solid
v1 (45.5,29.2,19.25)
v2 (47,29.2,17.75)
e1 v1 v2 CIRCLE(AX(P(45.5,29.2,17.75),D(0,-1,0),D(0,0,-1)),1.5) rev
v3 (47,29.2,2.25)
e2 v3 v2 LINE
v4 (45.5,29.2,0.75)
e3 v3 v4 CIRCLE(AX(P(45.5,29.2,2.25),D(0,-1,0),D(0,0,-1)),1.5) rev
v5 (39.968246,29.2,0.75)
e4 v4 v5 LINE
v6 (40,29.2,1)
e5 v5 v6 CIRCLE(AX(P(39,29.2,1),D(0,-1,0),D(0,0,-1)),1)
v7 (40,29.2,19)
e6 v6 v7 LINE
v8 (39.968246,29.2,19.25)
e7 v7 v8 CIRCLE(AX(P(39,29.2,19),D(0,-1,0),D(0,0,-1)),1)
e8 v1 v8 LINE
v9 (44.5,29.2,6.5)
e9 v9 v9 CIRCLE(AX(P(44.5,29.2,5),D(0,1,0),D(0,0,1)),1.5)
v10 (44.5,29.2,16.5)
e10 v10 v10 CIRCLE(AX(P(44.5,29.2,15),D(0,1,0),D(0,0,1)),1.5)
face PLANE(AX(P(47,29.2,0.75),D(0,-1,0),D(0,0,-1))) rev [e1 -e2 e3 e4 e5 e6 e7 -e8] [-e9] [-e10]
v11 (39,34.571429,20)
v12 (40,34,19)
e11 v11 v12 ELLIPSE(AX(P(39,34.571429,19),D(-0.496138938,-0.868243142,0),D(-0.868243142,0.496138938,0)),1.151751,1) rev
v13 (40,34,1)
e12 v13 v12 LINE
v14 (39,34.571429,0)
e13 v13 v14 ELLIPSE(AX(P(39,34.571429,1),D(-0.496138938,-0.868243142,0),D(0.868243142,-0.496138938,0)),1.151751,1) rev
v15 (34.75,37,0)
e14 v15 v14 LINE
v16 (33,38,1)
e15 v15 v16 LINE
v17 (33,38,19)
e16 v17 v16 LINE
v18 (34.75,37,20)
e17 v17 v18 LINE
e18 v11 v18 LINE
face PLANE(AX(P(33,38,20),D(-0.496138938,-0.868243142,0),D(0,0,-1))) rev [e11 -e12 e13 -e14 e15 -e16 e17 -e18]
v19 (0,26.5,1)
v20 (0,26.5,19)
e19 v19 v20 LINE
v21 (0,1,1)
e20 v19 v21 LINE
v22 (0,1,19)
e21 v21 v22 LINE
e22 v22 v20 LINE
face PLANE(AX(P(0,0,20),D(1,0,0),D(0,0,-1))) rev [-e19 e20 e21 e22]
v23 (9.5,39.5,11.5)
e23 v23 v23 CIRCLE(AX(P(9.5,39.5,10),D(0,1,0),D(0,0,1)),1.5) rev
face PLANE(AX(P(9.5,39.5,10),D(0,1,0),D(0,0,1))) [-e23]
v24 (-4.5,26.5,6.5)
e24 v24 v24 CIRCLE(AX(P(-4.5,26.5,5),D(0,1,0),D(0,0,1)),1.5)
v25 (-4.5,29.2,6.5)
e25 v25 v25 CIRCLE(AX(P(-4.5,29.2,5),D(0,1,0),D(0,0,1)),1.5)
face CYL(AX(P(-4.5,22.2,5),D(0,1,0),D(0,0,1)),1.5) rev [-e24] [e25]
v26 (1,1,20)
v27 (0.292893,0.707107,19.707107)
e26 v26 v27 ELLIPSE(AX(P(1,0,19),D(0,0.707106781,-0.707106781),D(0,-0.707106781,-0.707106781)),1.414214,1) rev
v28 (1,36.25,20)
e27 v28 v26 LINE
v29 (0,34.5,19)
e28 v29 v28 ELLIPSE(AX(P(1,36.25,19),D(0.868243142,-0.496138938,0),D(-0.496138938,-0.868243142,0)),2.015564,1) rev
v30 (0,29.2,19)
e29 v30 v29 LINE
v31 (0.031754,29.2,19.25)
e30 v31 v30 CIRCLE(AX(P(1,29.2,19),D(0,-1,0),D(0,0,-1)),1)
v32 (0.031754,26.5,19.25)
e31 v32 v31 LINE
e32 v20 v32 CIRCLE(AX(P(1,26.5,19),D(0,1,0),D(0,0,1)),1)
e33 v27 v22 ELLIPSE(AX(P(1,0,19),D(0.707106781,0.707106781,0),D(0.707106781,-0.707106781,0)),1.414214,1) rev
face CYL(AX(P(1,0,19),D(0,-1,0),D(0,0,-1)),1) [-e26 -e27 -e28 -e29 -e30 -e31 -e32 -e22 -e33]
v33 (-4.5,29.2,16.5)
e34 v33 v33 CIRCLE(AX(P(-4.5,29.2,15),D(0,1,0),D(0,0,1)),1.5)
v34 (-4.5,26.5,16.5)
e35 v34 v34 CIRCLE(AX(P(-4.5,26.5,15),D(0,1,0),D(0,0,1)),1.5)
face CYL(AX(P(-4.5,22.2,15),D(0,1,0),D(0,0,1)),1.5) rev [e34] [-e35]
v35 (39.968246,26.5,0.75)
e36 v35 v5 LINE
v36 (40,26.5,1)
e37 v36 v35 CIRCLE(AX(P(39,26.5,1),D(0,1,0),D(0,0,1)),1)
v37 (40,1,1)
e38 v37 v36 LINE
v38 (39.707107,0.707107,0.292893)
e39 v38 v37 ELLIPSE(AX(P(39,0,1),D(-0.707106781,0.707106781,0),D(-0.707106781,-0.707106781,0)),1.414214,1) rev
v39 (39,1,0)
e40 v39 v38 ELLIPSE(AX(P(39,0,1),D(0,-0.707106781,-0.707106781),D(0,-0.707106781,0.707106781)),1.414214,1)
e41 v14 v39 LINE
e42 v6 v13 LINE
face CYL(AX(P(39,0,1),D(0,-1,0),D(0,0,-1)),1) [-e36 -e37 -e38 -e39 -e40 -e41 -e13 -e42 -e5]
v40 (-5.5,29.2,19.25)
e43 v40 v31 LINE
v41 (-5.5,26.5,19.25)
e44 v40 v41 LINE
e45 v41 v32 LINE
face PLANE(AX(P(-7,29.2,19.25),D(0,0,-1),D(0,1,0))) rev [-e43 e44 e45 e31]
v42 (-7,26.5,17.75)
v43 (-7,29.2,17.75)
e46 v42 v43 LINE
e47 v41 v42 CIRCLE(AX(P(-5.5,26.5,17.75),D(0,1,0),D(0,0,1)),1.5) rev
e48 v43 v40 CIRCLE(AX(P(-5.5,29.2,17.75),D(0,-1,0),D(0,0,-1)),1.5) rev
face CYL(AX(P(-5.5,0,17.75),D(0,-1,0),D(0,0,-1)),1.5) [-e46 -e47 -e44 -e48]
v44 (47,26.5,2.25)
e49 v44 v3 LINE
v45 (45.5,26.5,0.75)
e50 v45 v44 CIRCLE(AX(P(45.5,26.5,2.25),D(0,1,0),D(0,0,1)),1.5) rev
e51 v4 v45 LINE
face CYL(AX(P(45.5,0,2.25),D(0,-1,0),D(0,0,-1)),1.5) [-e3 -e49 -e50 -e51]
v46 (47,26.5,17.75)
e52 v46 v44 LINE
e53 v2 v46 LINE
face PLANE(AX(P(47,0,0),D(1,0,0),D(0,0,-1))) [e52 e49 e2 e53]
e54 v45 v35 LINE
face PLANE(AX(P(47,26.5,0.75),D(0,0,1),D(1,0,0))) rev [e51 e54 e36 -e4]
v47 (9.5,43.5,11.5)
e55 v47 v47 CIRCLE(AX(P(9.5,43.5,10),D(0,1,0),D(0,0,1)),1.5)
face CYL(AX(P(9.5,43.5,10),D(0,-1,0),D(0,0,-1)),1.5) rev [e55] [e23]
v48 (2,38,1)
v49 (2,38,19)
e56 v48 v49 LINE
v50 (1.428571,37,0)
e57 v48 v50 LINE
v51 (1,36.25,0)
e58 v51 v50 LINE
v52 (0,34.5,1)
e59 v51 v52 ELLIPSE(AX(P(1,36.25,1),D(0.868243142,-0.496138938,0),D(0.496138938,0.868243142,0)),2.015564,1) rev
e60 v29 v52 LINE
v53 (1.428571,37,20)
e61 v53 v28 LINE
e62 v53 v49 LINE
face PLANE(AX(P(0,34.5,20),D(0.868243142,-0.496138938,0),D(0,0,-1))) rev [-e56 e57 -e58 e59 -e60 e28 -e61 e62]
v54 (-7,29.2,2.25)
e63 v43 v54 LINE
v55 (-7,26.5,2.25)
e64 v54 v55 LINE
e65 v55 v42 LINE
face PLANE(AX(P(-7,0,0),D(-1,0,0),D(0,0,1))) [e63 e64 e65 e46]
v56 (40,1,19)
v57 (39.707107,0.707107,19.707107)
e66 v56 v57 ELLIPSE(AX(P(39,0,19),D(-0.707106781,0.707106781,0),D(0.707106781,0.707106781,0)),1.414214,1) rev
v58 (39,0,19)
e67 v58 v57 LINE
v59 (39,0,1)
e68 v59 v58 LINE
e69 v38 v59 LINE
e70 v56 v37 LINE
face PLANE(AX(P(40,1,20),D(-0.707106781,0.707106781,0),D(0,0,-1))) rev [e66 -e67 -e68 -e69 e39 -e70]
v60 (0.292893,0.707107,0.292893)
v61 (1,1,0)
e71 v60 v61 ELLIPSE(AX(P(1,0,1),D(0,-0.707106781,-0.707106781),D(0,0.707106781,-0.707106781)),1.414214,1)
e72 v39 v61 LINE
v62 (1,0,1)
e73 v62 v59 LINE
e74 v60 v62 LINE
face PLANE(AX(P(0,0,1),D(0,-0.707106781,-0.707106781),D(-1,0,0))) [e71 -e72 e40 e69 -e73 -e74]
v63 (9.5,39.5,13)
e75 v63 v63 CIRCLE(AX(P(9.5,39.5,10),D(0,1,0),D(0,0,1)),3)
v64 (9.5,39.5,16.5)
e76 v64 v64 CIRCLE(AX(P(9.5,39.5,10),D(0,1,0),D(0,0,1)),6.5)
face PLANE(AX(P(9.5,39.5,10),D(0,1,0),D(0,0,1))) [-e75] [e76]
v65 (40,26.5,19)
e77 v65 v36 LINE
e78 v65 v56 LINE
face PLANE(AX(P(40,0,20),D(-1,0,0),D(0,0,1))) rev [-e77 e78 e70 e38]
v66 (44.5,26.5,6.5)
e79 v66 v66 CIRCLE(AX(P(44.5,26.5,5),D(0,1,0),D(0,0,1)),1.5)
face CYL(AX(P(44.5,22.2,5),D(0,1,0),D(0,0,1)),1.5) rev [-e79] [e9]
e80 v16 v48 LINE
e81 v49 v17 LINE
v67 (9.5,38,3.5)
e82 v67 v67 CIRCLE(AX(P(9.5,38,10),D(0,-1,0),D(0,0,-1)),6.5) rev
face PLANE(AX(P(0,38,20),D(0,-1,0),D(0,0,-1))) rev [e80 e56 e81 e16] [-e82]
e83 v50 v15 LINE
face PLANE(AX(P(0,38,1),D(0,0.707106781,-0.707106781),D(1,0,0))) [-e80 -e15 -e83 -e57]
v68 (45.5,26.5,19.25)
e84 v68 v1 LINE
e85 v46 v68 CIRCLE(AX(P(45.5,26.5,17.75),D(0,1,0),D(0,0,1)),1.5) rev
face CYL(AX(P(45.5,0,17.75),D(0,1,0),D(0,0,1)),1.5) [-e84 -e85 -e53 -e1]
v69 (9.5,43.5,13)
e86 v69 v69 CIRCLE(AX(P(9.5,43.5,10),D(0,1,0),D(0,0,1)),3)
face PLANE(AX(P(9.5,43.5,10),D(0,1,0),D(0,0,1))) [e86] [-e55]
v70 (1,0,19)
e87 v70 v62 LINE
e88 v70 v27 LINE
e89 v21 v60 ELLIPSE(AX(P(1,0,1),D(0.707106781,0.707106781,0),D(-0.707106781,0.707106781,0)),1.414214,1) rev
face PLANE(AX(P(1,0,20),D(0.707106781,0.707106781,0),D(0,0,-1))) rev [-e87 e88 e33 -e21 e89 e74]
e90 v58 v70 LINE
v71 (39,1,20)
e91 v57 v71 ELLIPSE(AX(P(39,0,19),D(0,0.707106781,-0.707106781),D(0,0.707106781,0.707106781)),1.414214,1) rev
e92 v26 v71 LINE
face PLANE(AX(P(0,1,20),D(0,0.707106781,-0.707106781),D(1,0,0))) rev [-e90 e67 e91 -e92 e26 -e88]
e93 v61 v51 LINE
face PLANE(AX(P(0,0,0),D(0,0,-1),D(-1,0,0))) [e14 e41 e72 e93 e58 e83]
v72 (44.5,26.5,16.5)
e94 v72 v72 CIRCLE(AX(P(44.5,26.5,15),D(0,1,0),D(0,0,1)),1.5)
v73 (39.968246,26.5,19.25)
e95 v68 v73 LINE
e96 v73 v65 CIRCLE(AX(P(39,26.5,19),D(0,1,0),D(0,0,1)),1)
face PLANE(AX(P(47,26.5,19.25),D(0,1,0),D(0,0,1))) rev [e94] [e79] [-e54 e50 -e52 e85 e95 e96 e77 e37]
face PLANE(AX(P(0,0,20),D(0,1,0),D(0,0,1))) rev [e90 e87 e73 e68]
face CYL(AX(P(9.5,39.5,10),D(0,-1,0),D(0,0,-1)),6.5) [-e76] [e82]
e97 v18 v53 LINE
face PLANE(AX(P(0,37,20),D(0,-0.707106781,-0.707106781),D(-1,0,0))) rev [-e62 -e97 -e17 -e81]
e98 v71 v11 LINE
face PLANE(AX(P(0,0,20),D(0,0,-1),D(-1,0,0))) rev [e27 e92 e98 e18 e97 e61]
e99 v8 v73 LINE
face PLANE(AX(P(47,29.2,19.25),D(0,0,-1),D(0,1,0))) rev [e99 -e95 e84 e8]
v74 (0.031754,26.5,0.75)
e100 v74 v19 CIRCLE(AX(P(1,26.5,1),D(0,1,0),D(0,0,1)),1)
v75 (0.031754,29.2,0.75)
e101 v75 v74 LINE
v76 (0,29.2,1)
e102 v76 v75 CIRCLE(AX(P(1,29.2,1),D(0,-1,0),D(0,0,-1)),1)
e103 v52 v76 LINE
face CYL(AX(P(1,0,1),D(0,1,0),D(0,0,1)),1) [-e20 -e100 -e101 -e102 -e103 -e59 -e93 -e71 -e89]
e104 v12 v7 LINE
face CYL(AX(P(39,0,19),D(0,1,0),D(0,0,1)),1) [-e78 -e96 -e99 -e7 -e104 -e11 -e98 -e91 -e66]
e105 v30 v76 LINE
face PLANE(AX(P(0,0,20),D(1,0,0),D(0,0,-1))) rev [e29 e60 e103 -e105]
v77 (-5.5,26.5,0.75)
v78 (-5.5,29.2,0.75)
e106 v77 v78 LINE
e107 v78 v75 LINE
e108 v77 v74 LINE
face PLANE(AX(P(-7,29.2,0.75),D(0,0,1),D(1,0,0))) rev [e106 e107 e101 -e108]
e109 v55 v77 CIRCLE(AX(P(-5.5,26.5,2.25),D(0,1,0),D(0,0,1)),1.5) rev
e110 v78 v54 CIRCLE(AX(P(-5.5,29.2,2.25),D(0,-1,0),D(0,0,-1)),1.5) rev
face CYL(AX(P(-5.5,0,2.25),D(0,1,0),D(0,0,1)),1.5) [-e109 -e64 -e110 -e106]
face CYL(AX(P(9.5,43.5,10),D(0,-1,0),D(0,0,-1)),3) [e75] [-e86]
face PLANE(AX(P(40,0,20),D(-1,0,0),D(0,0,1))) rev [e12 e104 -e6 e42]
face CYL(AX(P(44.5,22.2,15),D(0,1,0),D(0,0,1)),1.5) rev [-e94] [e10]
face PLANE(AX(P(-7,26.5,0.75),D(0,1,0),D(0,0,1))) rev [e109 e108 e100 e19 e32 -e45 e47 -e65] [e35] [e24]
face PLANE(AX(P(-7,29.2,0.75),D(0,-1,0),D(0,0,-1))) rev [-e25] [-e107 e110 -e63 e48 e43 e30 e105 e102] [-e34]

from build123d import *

# Parameters (mm, degrees)
SKETCH_1_W          = 40
SKETCH_1_H          = 38
EXTRUDE_1_DEPTH     = 20
SKETCH_2_W          = 18.5
SKETCH_2_H          = 2.7
EXTRUDE_2_DEPTH     = 7
SKETCH_3_W          = 18.5
SKETCH_3_H          = 2.7
EXTRUDE_3_DEPTH     = 7
SKETCH_4_R          = 1.5
CUT_EXTRUDE_1_DEPTH = 7
CHAMFER_1_SIZE      = 1
CHAMFER_2_SIZE      = 2
CHAMFER_2_SIZE2     = 3.5
CHAMFER_3_SIZE      = 4
CHAMFER_3_SIZE2     = 7
CHAMFER_4_SIZE      = 1
SKETCH_5_R          = 6.5
EXTRUDE_4_DEPTH     = 1.5
SKETCH_6_R          = 3
SKETCH_6_R_2        = 1.5
EXTRUDE_5_DEPTH     = 4
FILLET_1_R          = 1.5
FILLET_2_R          = 1


with BuildPart() as part:
    # 草图1 → 凸台-拉伸1 (new body)
    with BuildSketch(Plane.XY):
        with Locations((20, 19)):
            Rectangle(SKETCH_1_W, SKETCH_1_H)
    extrude(amount=EXTRUDE_1_DEPTH)

    # 草图2 → 凸台-拉伸2 (add)
    with BuildSketch(Plane.ZY):
        with Locations((10, 27.85)):
            Rectangle(SKETCH_2_W, SKETCH_2_H)
    extrude(amount=EXTRUDE_2_DEPTH)

    # 草图3 → 凸台-拉伸3 (add)
    with BuildSketch(Plane(origin=(40, 0, 0), x_dir=(0, 0, -1), z_dir=(1, 0, 0))):
        with Locations((-10, 27.85)):
            Rectangle(SKETCH_3_W, SKETCH_3_H)
    extrude(amount=EXTRUDE_3_DEPTH)

    # 草图4 → 切除-拉伸1 (cut)
    with BuildSketch(Plane(origin=(0, 29.2, 0), x_dir=(1, 0, 0), z_dir=(0, 1, 0))):
        with Locations(Location((-4.5, -5, 0), (0, 0, 270))):
            Circle(SKETCH_4_R)
        with Locations(Location((44.5, -5, 0), (0, 0, 270))):
            Circle(SKETCH_4_R)
        with Locations(Location((-4.5, -15, 0), (0, 0, 270))):
            Circle(SKETCH_4_R)
        with Locations(Location((44.5, -15, 0), (0, 0, 270))):
            Circle(SKETCH_4_R)
    extrude(amount=-CUT_EXTRUDE_1_DEPTH, mode=Mode.SUBTRACT)

    # 倒角1
    chamfer_1_edges = [part.edges().sort_by_distance(p)[0] for p in [
        (20, 0, 0),
        (40, 0, 10),
        (0, 0, 10),
        (20, 0, 20),
    ]]
    chamfer(chamfer_1_edges, length=CHAMFER_1_SIZE)

    # 倒角2
    chamfer_2_edges = [part.edges().sort_by_distance(p)[0] for p in [
        (0, 38, 10),
    ]]
    chamfer_2_side = [part.faces().sort_by_distance(p)[0] for p in [
        (20, 38, 10),
    ]]
    chamfer(chamfer_2_edges, length=CHAMFER_2_SIZE, length2=CHAMFER_2_SIZE2, reference=chamfer_2_side[0])

    # 倒角3
    chamfer_3_edges = [part.edges().sort_by_distance(p)[0] for p in [
        (40, 38, 10),
    ]]
    chamfer_3_side = [part.faces().sort_by_distance(p)[0] for p in [
        (40, 18.895576408, 10),
    ]]
    chamfer(chamfer_3_edges, length=CHAMFER_3_SIZE, length2=CHAMFER_3_SIZE2, reference=chamfer_3_side[0])

    # 倒角4
    chamfer_4_edges = [part.edges().sort_by_distance(p)[0] for p in [
        (17.5, 38, 0),
        (17.5, 38, 20),
    ]]
    chamfer(chamfer_4_edges, length=CHAMFER_4_SIZE)

    # 草图5 → 凸台-拉伸4 (add)
    with BuildSketch(Plane(origin=(0, 38, 0), x_dir=(1, 0, 0), z_dir=(0, 1, 0))):
        with Locations(Location((9.5, -10, 0), (0, 0, 90))):
            Circle(SKETCH_5_R)
    extrude(amount=EXTRUDE_4_DEPTH)

    # 草图6 → 凸台-拉伸5 (add)
    with BuildSketch(Plane(origin=(0, 39.5, 0), x_dir=(1, 0, 0), z_dir=(0, 1, 0))):
        with Locations(Location((9.5, -10, 0), (0, 0, 270))):
            Circle(SKETCH_6_R)
        with Locations(Location((9.5, -10, 0), (0, 0, 270))):
            Circle(SKETCH_6_R_2, mode=Mode.SUBTRACT)
    extrude(amount=EXTRUDE_5_DEPTH)

    # 圆角1
    fillet_1_edges = [part.edges().sort_by_distance(p)[0] for p in [
        (-7, 27.85, 0.75),
        (-7, 27.85, 19.25),
        (47, 27.85, 19.25),
        (47, 27.85, 0.75),
    ]]
    fillet(fillet_1_edges, radius=FILLET_1_R)

    # 圆角2
    # the kernel refuses this fillet: 1 mm, written as the material it takes off along each edge
    with BuildSketch(Plane(origin=(0, 37, 20), x_dir=(1, 0, 0), z_dir=(0, -1, 0))) as fillet_2_piece_1_section:
        with BuildLine():
            CenterArc((FILLET_2_R, -FILLET_2_R), FILLET_2_R, 90, 90)
            Line((0, -FILLET_2_R), (0, 0))
            Line((0, 0), (FILLET_2_R, 0))
        make_face()
    fillet_2_piece_1 = extrude(amount=38.5, mode=Mode.PRIVATE)
    fillet_2_piece_1 = split(fillet_2_piece_1, bisect_by=Plane(origin=(0.233478453, 29.2, 19.792941909), z_dir=(0, 1, 0)), keep=Keep.TOP, mode=Mode.PRIVATE)
    fillet_2_piece_1 = split(fillet_2_piece_1, bisect_by=Plane(origin=(0.233478453, 33.1, 19.25), z_dir=(0, 0, 1)), keep=Keep.TOP, mode=Mode.PRIVATE)
    add(fillet_2_piece_1, mode=Mode.SUBTRACT)
    with BuildSketch(Plane(origin=(0, 37, 20), x_dir=(1, 0, 0), z_dir=(0, -1, 0))) as fillet_2_piece_2_section:
        with BuildLine():
            CenterArc((FILLET_2_R, -FILLET_2_R), FILLET_2_R, 90, 90)
            Line((0, -FILLET_2_R), (0, 0))
            Line((0, 0), (FILLET_2_R, 0))
        make_face()
    fillet_2_piece_2 = extrude(amount=38.5, mode=Mode.PRIVATE)
    fillet_2_piece_2 = split(fillet_2_piece_2, bisect_by=Plane(origin=(-0.003280029, 29.2, 19.146607635), z_dir=(0, 1, 0)), keep=Keep.TOP, mode=Mode.PRIVATE)
    fillet_2_piece_2 = split(fillet_2_piece_2, bisect_by=Plane(origin=(-0.003280029, 33.1, 19.25), z_dir=(0, 0, -1)), keep=Keep.TOP, mode=Mode.PRIVATE)
    add(fillet_2_piece_2, mode=Mode.SUBTRACT)
    with BuildSketch(Plane(origin=(0, 37, 20), x_dir=(1, 0, 0), z_dir=(0, -1, 0))) as fillet_2_piece_3_section:
        with BuildLine():
            CenterArc((FILLET_2_R, -FILLET_2_R), FILLET_2_R, 90, 90)
            Line((0, -FILLET_2_R), (0, 0))
            Line((0, 0), (FILLET_2_R, 0))
        make_face()
    fillet_2_piece_3 = extrude(amount=38.5, mode=Mode.PRIVATE)
    fillet_2_piece_3 = split(fillet_2_piece_3, bisect_by=Plane(origin=(0.233478453, 29.2, 19.792941909), z_dir=(0, -1, 0)), keep=Keep.TOP, mode=Mode.PRIVATE)
    fillet_2_piece_3 = split(fillet_2_piece_3, bisect_by=Plane(origin=(0.233478453, 27.85, 19.25), z_dir=(0, 0, 1)), keep=Keep.TOP, mode=Mode.PRIVATE)
    fillet_2_piece_3 = split(fillet_2_piece_3, bisect_by=Plane(origin=(0.233478453, 26.5, 19.792941909), z_dir=(0, 1, 0)), keep=Keep.TOP, mode=Mode.PRIVATE)
    add(fillet_2_piece_3, mode=Mode.SUBTRACT)
    with BuildSketch(Plane(origin=(0, 37, 20), x_dir=(1, 0, 0), z_dir=(0, -1, 0))) as fillet_2_piece_4_section:
        with BuildLine():
            CenterArc((FILLET_2_R, -FILLET_2_R), FILLET_2_R, 90, 90)
            Line((0, -FILLET_2_R), (0, 0))
            Line((0, 0), (FILLET_2_R, 0))
        make_face()
    fillet_2_piece_4 = extrude(amount=38.5, mode=Mode.PRIVATE)
    fillet_2_piece_4 = split(fillet_2_piece_4, bisect_by=Plane(origin=(0.233478453, 12.5, 19.25), z_dir=(0, 0, 1)), keep=Keep.TOP, mode=Mode.PRIVATE)
    fillet_2_piece_4 = split(fillet_2_piece_4, bisect_by=Plane(origin=(0.233478453, 26.5, 19.792941909), z_dir=(0, -1, 0)), keep=Keep.TOP, mode=Mode.PRIVATE)
    add(fillet_2_piece_4, mode=Mode.SUBTRACT)
    with BuildSketch(Plane(origin=(0, 37, 20), x_dir=(1, 0, 0), z_dir=(0, -1, 0))) as fillet_2_piece_5_section:
        with BuildLine():
            CenterArc((FILLET_2_R, -FILLET_2_R), FILLET_2_R, 90, 90)
            Line((0, -FILLET_2_R), (0, 0))
            Line((0, 0), (FILLET_2_R, 0))
        make_face()
    fillet_2_piece_5 = extrude(amount=38.5, mode=Mode.PRIVATE)
    fillet_2_piece_5 = split(fillet_2_piece_5, bisect_by=Plane(origin=(-0.003280029, 12.5, 19.25), z_dir=(0, 0, -1)), keep=Keep.TOP, mode=Mode.PRIVATE)
    fillet_2_piece_5 = split(fillet_2_piece_5, bisect_by=Plane(origin=(-0.003280029, 26.5, 19.146607635), z_dir=(0, -1, 0)), keep=Keep.TOP, mode=Mode.PRIVATE)
    add(fillet_2_piece_5, mode=Mode.SUBTRACT)
    with BuildSketch(Plane(origin=(0, 37, 0), x_dir=(1, 0, 0), z_dir=(0, -1, 0))) as fillet_2_piece_6_section:
        with BuildLine():
            CenterArc((FILLET_2_R, FILLET_2_R), FILLET_2_R, 180, 90)
            Line((0, FILLET_2_R), (0, 0))
            Line((0, 0), (FILLET_2_R, 0))
        make_face()
    fillet_2_piece_6 = extrude(amount=38.5, mode=Mode.PRIVATE)
    fillet_2_piece_6 = split(fillet_2_piece_6, bisect_by=Plane(origin=(0.233478453, 29.2, 0.207058091), z_dir=(0, 1, 0)), keep=Keep.TOP, mode=Mode.PRIVATE)
    fillet_2_piece_6 = split(fillet_2_piece_6, bisect_by=Plane(origin=(0.233478453, 33.1, 0.75), z_dir=(0, 0, -1)), keep=Keep.TOP, mode=Mode.PRIVATE)
    add(fillet_2_piece_6, mode=Mode.SUBTRACT)
    with BuildSketch(Plane(origin=(0, 37, 0), x_dir=(1, 0, 0), z_dir=(0, -1, 0))) as fillet_2_piece_7_section:
        with BuildLine():
            CenterArc((FILLET_2_R, FILLET_2_R), FILLET_2_R, 180, 90)
            Line((0, FILLET_2_R), (0, 0))
            Line((0, 0), (FILLET_2_R, 0))
        make_face()
    fillet_2_piece_7 = extrude(amount=38.5, mode=Mode.PRIVATE)
    fillet_2_piece_7 = split(fillet_2_piece_7, bisect_by=Plane(origin=(-0.003280029, 29.2, 0.853392365), z_dir=(0, 1, 0)), keep=Keep.TOP, mode=Mode.PRIVATE)
    fillet_2_piece_7 = split(fillet_2_piece_7, bisect_by=Plane(origin=(-0.003280029, 33.1, 0.75), z_dir=(0, 0, 1)), keep=Keep.TOP, mode=Mode.PRIVATE)
    add(fillet_2_piece_7, mode=Mode.SUBTRACT)
    with BuildSketch(Plane(origin=(0, 37, 0), x_dir=(1, 0, 0), z_dir=(0, -1, 0))) as fillet_2_piece_8_section:
        with BuildLine():
            CenterArc((FILLET_2_R, FILLET_2_R), FILLET_2_R, 180, 90)
            Line((0, FILLET_2_R), (0, 0))
            Line((0, 0), (FILLET_2_R, 0))
        make_face()
    fillet_2_piece_8 = extrude(amount=38.5, mode=Mode.PRIVATE)
    fillet_2_piece_8 = split(fillet_2_piece_8, bisect_by=Plane(origin=(0.233478453, 29.2, 0.207058091), z_dir=(0, -1, 0)), keep=Keep.TOP, mode=Mode.PRIVATE)
    fillet_2_piece_8 = split(fillet_2_piece_8, bisect_by=Plane(origin=(0.233478453, 26.5, 0.207058091), z_dir=(0, 1, 0)), keep=Keep.TOP, mode=Mode.PRIVATE)
    fillet_2_piece_8 = split(fillet_2_piece_8, bisect_by=Plane(origin=(0.233478453, 27.85, 0.75), z_dir=(0, 0, -1)), keep=Keep.TOP, mode=Mode.PRIVATE)
    add(fillet_2_piece_8, mode=Mode.SUBTRACT)
    with BuildSketch(Plane(origin=(0, 37, 0), x_dir=(1, 0, 0), z_dir=(0, -1, 0))) as fillet_2_piece_9_section:
        with BuildLine():
            CenterArc((FILLET_2_R, FILLET_2_R), FILLET_2_R, 180, 90)
            Line((0, FILLET_2_R), (0, 0))
            Line((0, 0), (FILLET_2_R, 0))
        make_face()
    fillet_2_piece_9 = extrude(amount=38.5, mode=Mode.PRIVATE)
    fillet_2_piece_9 = split(fillet_2_piece_9, bisect_by=Plane(origin=(0.233478453, 26.5, 0.207058091), z_dir=(0, -1, 0)), keep=Keep.TOP, mode=Mode.PRIVATE)
    fillet_2_piece_9 = split(fillet_2_piece_9, bisect_by=Plane(origin=(0.233478453, 12.5, 0.75), z_dir=(0, 0, -1)), keep=Keep.TOP, mode=Mode.PRIVATE)
    add(fillet_2_piece_9, mode=Mode.SUBTRACT)
    with BuildSketch(Plane(origin=(0, 37, 0), x_dir=(1, 0, 0), z_dir=(0, -1, 0))) as fillet_2_piece_10_section:
        with BuildLine():
            CenterArc((FILLET_2_R, FILLET_2_R), FILLET_2_R, 180, 90)
            Line((0, FILLET_2_R), (0, 0))
            Line((0, 0), (FILLET_2_R, 0))
        make_face()
    fillet_2_piece_10 = extrude(amount=38.5, mode=Mode.PRIVATE)
    fillet_2_piece_10 = split(fillet_2_piece_10, bisect_by=Plane(origin=(-0.003280029, 26.5, 0.853392365), z_dir=(0, -1, 0)), keep=Keep.TOP, mode=Mode.PRIVATE)
    fillet_2_piece_10 = split(fillet_2_piece_10, bisect_by=Plane(origin=(-0.003280029, 12.5, 0.75), z_dir=(0, 0, 1)), keep=Keep.TOP, mode=Mode.PRIVATE)
    add(fillet_2_piece_10, mode=Mode.SUBTRACT)
    with BuildSketch(Plane(origin=(40, -1.5, 0), x_dir=(0, 0, 1), z_dir=(0, 1, 0))) as fillet_2_piece_11_section:
        with BuildLine():
            CenterArc((FILLET_2_R, -FILLET_2_R), FILLET_2_R, 90, 90)
            Line((0, -FILLET_2_R), (0, 0))
            Line((0, 0), (FILLET_2_R, 0))
        make_face()
    fillet_2_piece_11 = extrude(amount=38, mode=Mode.PRIVATE)
    fillet_2_piece_11 = split(fillet_2_piece_11, bisect_by=Plane(origin=(40.003280029, 26.5, 0.853392365), z_dir=(0, -1, 0)), keep=Keep.TOP, mode=Mode.PRIVATE)
    fillet_2_piece_11 = split(fillet_2_piece_11, bisect_by=Plane(origin=(40.003280029, 12.5, 0.75), z_dir=(0, 0, 1)), keep=Keep.TOP, mode=Mode.PRIVATE)
    add(fillet_2_piece_11, mode=Mode.SUBTRACT)
    with BuildSketch(Plane(origin=(40, -1.5, 0), x_dir=(0, 0, 1), z_dir=(0, 1, 0))) as fillet_2_piece_12_section:
        with BuildLine():
            CenterArc((FILLET_2_R, -FILLET_2_R), FILLET_2_R, 90, 90)
            Line((0, -FILLET_2_R), (0, 0))
            Line((0, 0), (FILLET_2_R, 0))
        make_face()
    fillet_2_piece_12 = extrude(amount=38, mode=Mode.PRIVATE)
    fillet_2_piece_12 = split(fillet_2_piece_12, bisect_by=Plane(origin=(39.766521547, 26.5, 0.207058091), z_dir=(0, -1, 0)), keep=Keep.TOP, mode=Mode.PRIVATE)
    fillet_2_piece_12 = split(fillet_2_piece_12, bisect_by=Plane(origin=(39.766521547, 12.5, 0.75), z_dir=(0, 0, -1)), keep=Keep.TOP, mode=Mode.PRIVATE)
    add(fillet_2_piece_12, mode=Mode.SUBTRACT)
    with BuildSketch(Plane(origin=(40, -1.5, 0), x_dir=(0, 0, 1), z_dir=(0, 1, 0))) as fillet_2_piece_13_section:
        with BuildLine():
            CenterArc((FILLET_2_R, -FILLET_2_R), FILLET_2_R, 90, 90)
            Line((0, -FILLET_2_R), (0, 0))
            Line((0, 0), (FILLET_2_R, 0))
        make_face()
    fillet_2_piece_13 = extrude(amount=38, mode=Mode.PRIVATE)
    fillet_2_piece_13 = split(fillet_2_piece_13, bisect_by=Plane(origin=(39.766521547, 26.5, 0.207058091), z_dir=(0, 1, 0)), keep=Keep.TOP, mode=Mode.PRIVATE)
    fillet_2_piece_13 = split(fillet_2_piece_13, bisect_by=Plane(origin=(39.766521547, 29.2, 0.207058091), z_dir=(0, -1, 0)), keep=Keep.TOP, mode=Mode.PRIVATE)
    fillet_2_piece_13 = split(fillet_2_piece_13, bisect_by=Plane(origin=(39.766521547, 27.85, 0.75), z_dir=(0, 0, -1)), keep=Keep.TOP, mode=Mode.PRIVATE)
    add(fillet_2_piece_13, mode=Mode.SUBTRACT)
    with BuildSketch(Plane(origin=(40, -1.5, 0), x_dir=(0, 0, 1), z_dir=(0, 1, 0))) as fillet_2_piece_14_section:
        with BuildLine():
            CenterArc((FILLET_2_R, -FILLET_2_R), FILLET_2_R, 90, 90)
            Line((0, -FILLET_2_R), (0, 0))
            Line((0, 0), (FILLET_2_R, 0))
        make_face()
    fillet_2_piece_14 = extrude(amount=38, mode=Mode.PRIVATE)
    fillet_2_piece_14 = split(fillet_2_piece_14, bisect_by=Plane(origin=(40.003280029, 29.2, 0.853392365), z_dir=(0, 1, 0)), keep=Keep.TOP, mode=Mode.PRIVATE)
    fillet_2_piece_14 = split(fillet_2_piece_14, bisect_by=Plane(origin=(40.003280029, 32.85, 0.75), z_dir=(0, 0, 1)), keep=Keep.TOP, mode=Mode.PRIVATE)
    add(fillet_2_piece_14, mode=Mode.SUBTRACT)
    with BuildSketch(Plane(origin=(40, -1.5, 0), x_dir=(0, 0, 1), z_dir=(0, 1, 0))) as fillet_2_piece_15_section:
        with BuildLine():
            CenterArc((FILLET_2_R, -FILLET_2_R), FILLET_2_R, 90, 90)
            Line((0, -FILLET_2_R), (0, 0))
            Line((0, 0), (FILLET_2_R, 0))
        make_face()
    fillet_2_piece_15 = extrude(amount=38, mode=Mode.PRIVATE)
    fillet_2_piece_15 = split(fillet_2_piece_15, bisect_by=Plane(origin=(39.766521547, 29.2, 0.207058091), z_dir=(0, 1, 0)), keep=Keep.TOP, mode=Mode.PRIVATE)
    fillet_2_piece_15 = split(fillet_2_piece_15, bisect_by=Plane(origin=(39.766521547, 32.85, 0.75), z_dir=(0, 0, -1)), keep=Keep.TOP, mode=Mode.PRIVATE)
    add(fillet_2_piece_15, mode=Mode.SUBTRACT)
    with BuildSketch(Plane(origin=(40, -1.5, 20), x_dir=(0, 0, -1), z_dir=(0, 1, 0))) as fillet_2_piece_16_section:
        with BuildLine():
            CenterArc((FILLET_2_R, FILLET_2_R), FILLET_2_R, 180, 90)
            Line((0, FILLET_2_R), (0, 0))
            Line((0, 0), (FILLET_2_R, 0))
        make_face()
    fillet_2_piece_16 = extrude(amount=38, mode=Mode.PRIVATE)
    fillet_2_piece_16 = split(fillet_2_piece_16, bisect_by=Plane(origin=(40.003280029, 26.5, 19.146607635), z_dir=(0, -1, 0)), keep=Keep.TOP, mode=Mode.PRIVATE)
    fillet_2_piece_16 = split(fillet_2_piece_16, bisect_by=Plane(origin=(40.003280029, 12.5, 19.25), z_dir=(0, 0, -1)), keep=Keep.TOP, mode=Mode.PRIVATE)
    add(fillet_2_piece_16, mode=Mode.SUBTRACT)
    with BuildSketch(Plane(origin=(40, -1.5, 20), x_dir=(0, 0, -1), z_dir=(0, 1, 0))) as fillet_2_piece_17_section:
        with BuildLine():
            CenterArc((FILLET_2_R, FILLET_2_R), FILLET_2_R, 180, 90)
            Line((0, FILLET_2_R), (0, 0))
            Line((0, 0), (FILLET_2_R, 0))
        make_face()
    fillet_2_piece_17 = extrude(amount=38, mode=Mode.PRIVATE)
    fillet_2_piece_17 = split(fillet_2_piece_17, bisect_by=Plane(origin=(39.766521547, 26.5, 19.792941909), z_dir=(0, -1, 0)), keep=Keep.TOP, mode=Mode.PRIVATE)
    fillet_2_piece_17 = split(fillet_2_piece_17, bisect_by=Plane(origin=(39.766521547, 12.5, 19.25), z_dir=(0, 0, 1)), keep=Keep.TOP, mode=Mode.PRIVATE)
    add(fillet_2_piece_17, mode=Mode.SUBTRACT)
    with BuildSketch(Plane(origin=(40, -1.5, 20), x_dir=(0, 0, -1), z_dir=(0, 1, 0))) as fillet_2_piece_18_section:
        with BuildLine():
            CenterArc((FILLET_2_R, FILLET_2_R), FILLET_2_R, 180, 90)
            Line((0, FILLET_2_R), (0, 0))
            Line((0, 0), (FILLET_2_R, 0))
        make_face()
    fillet_2_piece_18 = extrude(amount=38, mode=Mode.PRIVATE)
    fillet_2_piece_18 = split(fillet_2_piece_18, bisect_by=Plane(origin=(39.766521547, 26.5, 19.792941909), z_dir=(0, 1, 0)), keep=Keep.TOP, mode=Mode.PRIVATE)
    fillet_2_piece_18 = split(fillet_2_piece_18, bisect_by=Plane(origin=(39.766521547, 27.85, 19.25), z_dir=(0, 0, 1)), keep=Keep.TOP, mode=Mode.PRIVATE)
    fillet_2_piece_18 = split(fillet_2_piece_18, bisect_by=Plane(origin=(39.766521547, 29.2, 19.792941909), z_dir=(0, -1, 0)), keep=Keep.TOP, mode=Mode.PRIVATE)
    add(fillet_2_piece_18, mode=Mode.SUBTRACT)
    with BuildSketch(Plane(origin=(40, -1.5, 20), x_dir=(0, 0, -1), z_dir=(0, 1, 0))) as fillet_2_piece_19_section:
        with BuildLine():
            CenterArc((FILLET_2_R, FILLET_2_R), FILLET_2_R, 180, 90)
            Line((0, FILLET_2_R), (0, 0))
            Line((0, 0), (FILLET_2_R, 0))
        make_face()
    fillet_2_piece_19 = extrude(amount=38, mode=Mode.PRIVATE)
    fillet_2_piece_19 = split(fillet_2_piece_19, bisect_by=Plane(origin=(40.003280029, 32.85, 19.25), z_dir=(0, 0, -1)), keep=Keep.TOP, mode=Mode.PRIVATE)
    fillet_2_piece_19 = split(fillet_2_piece_19, bisect_by=Plane(origin=(40.003280029, 29.2, 19.146607635), z_dir=(0, 1, 0)), keep=Keep.TOP, mode=Mode.PRIVATE)
    add(fillet_2_piece_19, mode=Mode.SUBTRACT)
    with BuildSketch(Plane(origin=(40, -1.5, 20), x_dir=(0, 0, -1), z_dir=(0, 1, 0))) as fillet_2_piece_20_section:
        with BuildLine():
            CenterArc((FILLET_2_R, FILLET_2_R), FILLET_2_R, 180, 90)
            Line((0, FILLET_2_R), (0, 0))
            Line((0, 0), (FILLET_2_R, 0))
        make_face()
    fillet_2_piece_20 = extrude(amount=38, mode=Mode.PRIVATE)
    fillet_2_piece_20 = split(fillet_2_piece_20, bisect_by=Plane(origin=(39.766521547, 32.85, 19.25), z_dir=(0, 0, 1)), keep=Keep.TOP, mode=Mode.PRIVATE)
    fillet_2_piece_20 = split(fillet_2_piece_20, bisect_by=Plane(origin=(39.766521547, 29.2, 19.792941909), z_dir=(0, 1, 0)), keep=Keep.TOP, mode=Mode.PRIVATE)
    add(fillet_2_piece_20, mode=Mode.SUBTRACT)


solid = part.part
